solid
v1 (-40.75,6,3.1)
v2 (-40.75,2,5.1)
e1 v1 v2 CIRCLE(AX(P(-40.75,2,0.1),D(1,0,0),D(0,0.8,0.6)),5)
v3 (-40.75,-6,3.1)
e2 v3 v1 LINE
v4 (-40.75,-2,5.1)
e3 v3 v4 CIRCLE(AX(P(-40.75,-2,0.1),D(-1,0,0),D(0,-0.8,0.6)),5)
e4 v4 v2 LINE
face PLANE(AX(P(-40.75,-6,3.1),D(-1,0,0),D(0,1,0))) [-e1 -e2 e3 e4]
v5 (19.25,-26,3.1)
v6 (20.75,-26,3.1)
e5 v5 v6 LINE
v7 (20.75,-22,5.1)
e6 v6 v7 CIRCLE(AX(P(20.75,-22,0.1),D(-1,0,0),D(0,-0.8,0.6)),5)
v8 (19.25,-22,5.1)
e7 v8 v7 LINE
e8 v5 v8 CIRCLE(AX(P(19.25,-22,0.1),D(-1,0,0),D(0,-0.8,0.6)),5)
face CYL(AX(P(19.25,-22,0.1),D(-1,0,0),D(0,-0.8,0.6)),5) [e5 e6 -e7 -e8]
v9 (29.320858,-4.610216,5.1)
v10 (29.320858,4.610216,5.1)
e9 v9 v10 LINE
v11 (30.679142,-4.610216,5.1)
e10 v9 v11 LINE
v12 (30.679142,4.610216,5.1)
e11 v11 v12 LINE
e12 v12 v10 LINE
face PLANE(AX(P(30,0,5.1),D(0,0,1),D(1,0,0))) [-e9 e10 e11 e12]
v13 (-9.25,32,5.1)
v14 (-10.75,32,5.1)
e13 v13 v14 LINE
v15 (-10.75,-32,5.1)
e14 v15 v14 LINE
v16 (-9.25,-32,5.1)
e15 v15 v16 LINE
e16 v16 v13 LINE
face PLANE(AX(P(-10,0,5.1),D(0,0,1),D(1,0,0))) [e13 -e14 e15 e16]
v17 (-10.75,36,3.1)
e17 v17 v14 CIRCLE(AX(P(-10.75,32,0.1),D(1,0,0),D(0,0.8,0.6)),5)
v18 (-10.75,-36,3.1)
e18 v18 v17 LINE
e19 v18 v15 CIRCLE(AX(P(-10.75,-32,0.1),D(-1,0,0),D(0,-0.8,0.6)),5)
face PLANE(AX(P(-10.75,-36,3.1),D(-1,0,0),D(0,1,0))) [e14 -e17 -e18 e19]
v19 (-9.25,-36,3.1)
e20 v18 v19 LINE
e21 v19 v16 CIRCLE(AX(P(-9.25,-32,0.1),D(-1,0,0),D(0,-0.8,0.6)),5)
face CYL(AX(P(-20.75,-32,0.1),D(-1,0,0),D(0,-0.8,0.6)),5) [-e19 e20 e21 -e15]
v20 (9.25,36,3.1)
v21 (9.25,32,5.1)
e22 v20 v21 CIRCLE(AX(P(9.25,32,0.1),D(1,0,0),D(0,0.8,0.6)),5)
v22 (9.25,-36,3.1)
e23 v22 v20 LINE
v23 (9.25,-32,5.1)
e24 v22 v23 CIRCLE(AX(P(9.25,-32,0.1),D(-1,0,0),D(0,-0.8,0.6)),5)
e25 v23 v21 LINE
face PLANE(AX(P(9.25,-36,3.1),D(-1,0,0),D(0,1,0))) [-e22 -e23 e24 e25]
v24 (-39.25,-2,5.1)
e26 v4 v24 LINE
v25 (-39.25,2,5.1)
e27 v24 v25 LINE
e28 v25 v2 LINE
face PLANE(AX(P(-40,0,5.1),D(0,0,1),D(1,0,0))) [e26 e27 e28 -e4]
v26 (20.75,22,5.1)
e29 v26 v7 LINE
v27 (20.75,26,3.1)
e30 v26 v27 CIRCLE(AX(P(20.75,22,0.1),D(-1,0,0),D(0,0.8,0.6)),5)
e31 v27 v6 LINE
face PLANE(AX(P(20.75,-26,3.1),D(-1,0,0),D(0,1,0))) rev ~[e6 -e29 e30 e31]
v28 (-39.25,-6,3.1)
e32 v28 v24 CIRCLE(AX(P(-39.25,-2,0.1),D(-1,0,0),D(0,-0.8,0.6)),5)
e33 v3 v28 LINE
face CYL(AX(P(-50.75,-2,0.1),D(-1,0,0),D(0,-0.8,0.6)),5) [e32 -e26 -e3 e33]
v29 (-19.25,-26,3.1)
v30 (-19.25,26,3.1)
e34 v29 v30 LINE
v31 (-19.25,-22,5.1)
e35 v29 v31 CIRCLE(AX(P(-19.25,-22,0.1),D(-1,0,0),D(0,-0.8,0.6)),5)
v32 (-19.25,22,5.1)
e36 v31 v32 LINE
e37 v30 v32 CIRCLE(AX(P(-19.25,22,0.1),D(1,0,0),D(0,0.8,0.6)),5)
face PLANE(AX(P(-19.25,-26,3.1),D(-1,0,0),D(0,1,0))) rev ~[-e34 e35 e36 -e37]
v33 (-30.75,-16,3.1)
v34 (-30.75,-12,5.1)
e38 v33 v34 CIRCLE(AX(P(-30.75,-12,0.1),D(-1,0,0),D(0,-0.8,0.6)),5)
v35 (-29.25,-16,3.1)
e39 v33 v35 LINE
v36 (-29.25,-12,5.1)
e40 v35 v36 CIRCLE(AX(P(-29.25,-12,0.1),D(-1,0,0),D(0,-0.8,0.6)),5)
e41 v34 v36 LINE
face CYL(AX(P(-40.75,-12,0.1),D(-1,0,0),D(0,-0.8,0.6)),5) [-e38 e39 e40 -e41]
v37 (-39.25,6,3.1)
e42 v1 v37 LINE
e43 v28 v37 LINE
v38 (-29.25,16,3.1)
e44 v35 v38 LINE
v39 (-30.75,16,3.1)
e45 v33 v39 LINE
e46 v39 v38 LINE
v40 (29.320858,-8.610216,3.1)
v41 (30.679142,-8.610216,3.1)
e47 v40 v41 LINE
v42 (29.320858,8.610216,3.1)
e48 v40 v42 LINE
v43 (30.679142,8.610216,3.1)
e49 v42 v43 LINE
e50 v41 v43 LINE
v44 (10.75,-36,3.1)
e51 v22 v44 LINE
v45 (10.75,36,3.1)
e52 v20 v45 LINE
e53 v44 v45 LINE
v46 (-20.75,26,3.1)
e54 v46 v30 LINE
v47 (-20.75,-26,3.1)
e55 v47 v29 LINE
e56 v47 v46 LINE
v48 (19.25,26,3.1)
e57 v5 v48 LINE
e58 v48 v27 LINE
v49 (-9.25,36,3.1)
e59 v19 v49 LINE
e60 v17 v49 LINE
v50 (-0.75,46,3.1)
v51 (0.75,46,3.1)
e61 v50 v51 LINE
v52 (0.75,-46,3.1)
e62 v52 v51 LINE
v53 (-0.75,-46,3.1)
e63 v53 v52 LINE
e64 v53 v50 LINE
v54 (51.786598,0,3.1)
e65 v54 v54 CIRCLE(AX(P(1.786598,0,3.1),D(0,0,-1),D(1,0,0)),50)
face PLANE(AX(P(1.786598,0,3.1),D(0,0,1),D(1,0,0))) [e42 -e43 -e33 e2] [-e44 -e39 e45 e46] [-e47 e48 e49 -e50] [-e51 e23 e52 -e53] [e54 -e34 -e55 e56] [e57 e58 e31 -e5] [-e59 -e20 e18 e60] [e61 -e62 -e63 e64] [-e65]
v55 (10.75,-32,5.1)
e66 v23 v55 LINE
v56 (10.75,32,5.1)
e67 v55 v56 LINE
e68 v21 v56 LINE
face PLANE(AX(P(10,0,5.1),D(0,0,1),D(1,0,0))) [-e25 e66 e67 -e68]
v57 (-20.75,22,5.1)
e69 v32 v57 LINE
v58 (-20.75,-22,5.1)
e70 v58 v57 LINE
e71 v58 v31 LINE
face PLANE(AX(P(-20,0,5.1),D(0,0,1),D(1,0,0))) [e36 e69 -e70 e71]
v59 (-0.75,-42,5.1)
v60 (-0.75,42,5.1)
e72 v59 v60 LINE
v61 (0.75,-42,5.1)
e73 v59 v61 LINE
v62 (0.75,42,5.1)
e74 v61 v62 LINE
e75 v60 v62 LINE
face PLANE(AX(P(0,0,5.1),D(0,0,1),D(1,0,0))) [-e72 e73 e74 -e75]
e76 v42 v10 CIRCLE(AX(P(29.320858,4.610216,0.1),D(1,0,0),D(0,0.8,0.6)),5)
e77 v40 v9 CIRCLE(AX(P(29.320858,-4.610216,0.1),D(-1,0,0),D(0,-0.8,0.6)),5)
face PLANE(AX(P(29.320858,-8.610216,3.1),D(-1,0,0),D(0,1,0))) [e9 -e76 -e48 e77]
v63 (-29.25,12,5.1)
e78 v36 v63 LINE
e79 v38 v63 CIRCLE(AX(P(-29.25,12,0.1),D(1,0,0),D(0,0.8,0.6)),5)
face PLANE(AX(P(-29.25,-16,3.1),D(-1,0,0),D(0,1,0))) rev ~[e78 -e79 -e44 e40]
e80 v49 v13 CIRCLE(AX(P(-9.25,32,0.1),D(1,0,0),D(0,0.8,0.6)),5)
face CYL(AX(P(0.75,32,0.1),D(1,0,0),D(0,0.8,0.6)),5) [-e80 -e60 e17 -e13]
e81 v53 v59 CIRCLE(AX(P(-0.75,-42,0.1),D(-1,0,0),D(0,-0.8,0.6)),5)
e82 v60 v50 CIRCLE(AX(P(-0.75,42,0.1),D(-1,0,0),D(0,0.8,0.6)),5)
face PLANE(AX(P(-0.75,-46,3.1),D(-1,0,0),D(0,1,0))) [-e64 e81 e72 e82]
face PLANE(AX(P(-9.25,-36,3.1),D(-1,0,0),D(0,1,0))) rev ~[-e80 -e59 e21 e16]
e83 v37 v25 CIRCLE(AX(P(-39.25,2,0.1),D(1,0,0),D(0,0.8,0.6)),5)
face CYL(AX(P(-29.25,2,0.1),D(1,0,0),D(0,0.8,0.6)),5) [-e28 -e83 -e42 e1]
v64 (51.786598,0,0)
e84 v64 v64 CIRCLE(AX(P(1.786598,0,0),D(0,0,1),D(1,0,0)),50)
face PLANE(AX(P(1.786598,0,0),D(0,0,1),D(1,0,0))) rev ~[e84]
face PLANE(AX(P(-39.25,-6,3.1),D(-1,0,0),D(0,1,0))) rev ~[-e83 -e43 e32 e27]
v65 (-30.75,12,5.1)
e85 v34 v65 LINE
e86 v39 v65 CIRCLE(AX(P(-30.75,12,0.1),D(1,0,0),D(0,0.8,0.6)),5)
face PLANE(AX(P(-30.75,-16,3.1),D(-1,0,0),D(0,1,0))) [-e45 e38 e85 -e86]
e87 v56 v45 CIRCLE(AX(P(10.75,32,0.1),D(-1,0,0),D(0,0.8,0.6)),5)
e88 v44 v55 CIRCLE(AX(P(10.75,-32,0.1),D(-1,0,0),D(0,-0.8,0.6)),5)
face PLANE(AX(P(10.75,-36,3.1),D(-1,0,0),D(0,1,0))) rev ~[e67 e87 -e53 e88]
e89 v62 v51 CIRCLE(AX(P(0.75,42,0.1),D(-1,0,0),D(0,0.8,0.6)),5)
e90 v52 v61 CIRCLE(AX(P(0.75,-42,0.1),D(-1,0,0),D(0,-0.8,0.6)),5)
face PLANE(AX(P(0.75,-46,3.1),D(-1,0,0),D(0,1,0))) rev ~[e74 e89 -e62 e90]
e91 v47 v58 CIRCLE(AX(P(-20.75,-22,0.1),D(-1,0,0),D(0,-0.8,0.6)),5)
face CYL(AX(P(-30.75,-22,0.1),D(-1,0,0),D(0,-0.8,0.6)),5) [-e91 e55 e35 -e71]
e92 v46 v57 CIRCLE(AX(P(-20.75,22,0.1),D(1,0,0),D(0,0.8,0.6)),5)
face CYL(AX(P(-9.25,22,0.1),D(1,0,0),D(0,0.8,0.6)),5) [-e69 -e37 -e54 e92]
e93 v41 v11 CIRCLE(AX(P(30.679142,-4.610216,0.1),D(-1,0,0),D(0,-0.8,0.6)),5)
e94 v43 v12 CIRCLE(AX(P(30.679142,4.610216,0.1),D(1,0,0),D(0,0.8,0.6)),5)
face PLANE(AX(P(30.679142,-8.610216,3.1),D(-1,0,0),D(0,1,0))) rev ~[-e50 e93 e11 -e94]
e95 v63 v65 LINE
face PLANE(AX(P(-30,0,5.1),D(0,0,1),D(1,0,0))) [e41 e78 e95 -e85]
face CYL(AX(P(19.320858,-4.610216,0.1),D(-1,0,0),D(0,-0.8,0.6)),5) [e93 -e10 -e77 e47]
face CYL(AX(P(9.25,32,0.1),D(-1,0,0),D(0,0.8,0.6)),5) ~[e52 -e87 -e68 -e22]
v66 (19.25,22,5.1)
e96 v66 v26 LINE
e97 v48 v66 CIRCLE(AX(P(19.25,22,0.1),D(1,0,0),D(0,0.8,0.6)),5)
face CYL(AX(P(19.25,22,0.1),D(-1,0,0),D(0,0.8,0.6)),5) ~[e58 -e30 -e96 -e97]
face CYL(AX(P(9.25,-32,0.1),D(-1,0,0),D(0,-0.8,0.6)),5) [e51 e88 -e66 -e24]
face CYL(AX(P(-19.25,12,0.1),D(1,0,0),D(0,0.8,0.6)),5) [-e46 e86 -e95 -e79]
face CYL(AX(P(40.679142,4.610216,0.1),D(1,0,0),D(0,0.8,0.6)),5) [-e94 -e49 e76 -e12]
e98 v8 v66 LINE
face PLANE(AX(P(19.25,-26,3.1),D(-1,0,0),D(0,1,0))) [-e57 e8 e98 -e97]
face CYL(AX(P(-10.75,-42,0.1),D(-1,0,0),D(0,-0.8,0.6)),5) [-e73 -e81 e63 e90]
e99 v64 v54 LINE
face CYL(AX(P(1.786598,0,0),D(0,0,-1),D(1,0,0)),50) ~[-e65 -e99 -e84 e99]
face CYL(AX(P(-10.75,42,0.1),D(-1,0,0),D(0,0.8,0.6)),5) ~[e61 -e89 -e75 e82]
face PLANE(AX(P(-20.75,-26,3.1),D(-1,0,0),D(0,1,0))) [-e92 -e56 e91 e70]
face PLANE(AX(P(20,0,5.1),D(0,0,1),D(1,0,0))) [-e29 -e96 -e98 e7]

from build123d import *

# Parameters (mm, degrees)
F0_R         = 50
F1_DEPTH     = 3.1
F2_W         = 1.5
F2_H         = 92
F2_H_2       = 72
F2_H_3       = 52
F2_H_4       = 32
F2_H_5       = 12
F2_W_2       = 1.3582831621
F2_H_6       = 17.2204319388
F3_DEPTH     = 2
F4_T1_DEPTH  = 11.5
F4_T3_DEPTH  = 11.5
F4_T5_DEPTH  = 21.5
F4_T10_DEPTH = 21.5
F4_T15_DEPTH = 21.5
F4_T20_DEPTH = 21.5
F4_T25_DEPTH = 21.5
F4_T30_DEPTH = 21.5
F4_T35_DEPTH = 21.5
F4_T40_DEPTH = 21.5
F4_T45_DEPTH = 21.5
F4_T50_DEPTH = 21.3582831621
F4_T55_DEPTH = 21.3582831621


# Not quite as in the source:
# - a fillet or chamfer that OpenCascade refuses, or shapes differently, is made with other operations: its cross-section is extruded or revolved along the edge and cut away or added


with BuildPart() as f1:
    # F0 (on Top) → F1 (new body)
    with BuildSketch(Plane.XY):
        with Locations((1.7865982372, 0)):
            Circle(F0_R)
    extrude(amount=F1_DEPTH)

    # F2 (on face) → F3 (join)
    with BuildSketch(Plane.XY.offset(3.1)):
        Rectangle(F2_W, F2_H)
        with Locations((-10, 0)):
            Rectangle(F2_W, F2_H_2)
        with Locations((-20, 0)):
            Rectangle(F2_W, F2_H_3)
        with Locations((-30, 0)):
            Rectangle(F2_W, F2_H_4)
        with Locations((-40, 0)):
            Rectangle(F2_W, F2_H_5)
        with Locations((10, 0)):
            Rectangle(F2_W, F2_H_2)
        with Locations((20, 0)):
            Rectangle(F2_W, F2_H_3)
        with Locations((30, 0)):
            Rectangle(F2_W_2, F2_H_6)
    extrude(amount=F3_DEPTH)

    # F4: fillet of radius 5 on 16 edges, made by hand

    # F4_s2 → F4_t1 (cut)
    with BuildSketch(Plane.YZ.offset(9.25)):
        with BuildLine():
            ThreePointArc((-36, 3.1), (-34.2360679775, 4.572135955), (-32, 5.1))
            Line((-32, 5.1), (-36, 5.1))
            Line((-36, 5.1), (-36, 3.1))
        make_face()
        with BuildLine():
            ThreePointArc((36, 3.1), (34.2360679775, 4.572135955), (32, 5.1))
            Line((32, 5.1), (36, 5.1))
            Line((36, 5.1), (36, 3.1))
        make_face()
    extrude(amount=F4_T1_DEPTH, mode=Mode.SUBTRACT)

    # F4_s4 → F4_t3 (cut)
    with BuildSketch(Plane.YZ.offset(19.25)):
        with BuildLine():
            ThreePointArc((26, 3.1), (24.2360679775, 4.572135955), (22, 5.1))
            Line((22, 5.1), (26, 5.1))
            Line((26, 5.1), (26, 3.1))
        make_face()
        with BuildLine():
            ThreePointArc((-26, 3.1), (-24.2360679775, 4.572135955), (-22, 5.1))
            Line((-22, 5.1), (-26, 5.1))
            Line((-26, 5.1), (-26, 3.1))
        make_face()
    extrude(amount=F4_T3_DEPTH, mode=Mode.SUBTRACT)

    # F4_s6 → F4_t5 (cut)
    with BuildSketch(Plane.YZ.offset(-10.75)):
        with BuildLine():
            ThreePointArc((46, 3.1), (44.2360679775, 4.572135955), (42, 5.1))
            Line((42, 5.1), (46, 5.1))
            Line((46, 5.1), (46, 3.1))
        make_face()
        with BuildLine():
            ThreePointArc((-46, 3.1), (-44.2360679775, 4.572135955), (-42, 5.1))
            Line((-42, 5.1), (-46, 5.1))
            Line((-46, 5.1), (-46, 3.1))
        make_face()
    extrude(amount=F4_T5_DEPTH, mode=Mode.SUBTRACT)


with BuildPart() as f4_tool8:
    # F4_s9 → F4_t10 (new body)
    with BuildSketch(Plane.YZ.offset(0.75)):
        with BuildLine():
            ThreePointArc((36, 3.1), (34.2360679775, 4.572135955), (32, 5.1))
            Line((32, 5.1), (36, 5.1))
            Line((36, 5.1), (36, 3.1))
        make_face()
    extrude(amount=-F4_T10_DEPTH)

    split(bisect_by=Plane.YZ.offset(-0.75), keep=Keep.BOTTOM)


with BuildPart() as f1_1:
    add(f1.part)

    # F4_t7: cut F4_tool8
    add(f4_tool8.part, mode=Mode.SUBTRACT)


with BuildPart() as f4_tool13:
    # F4_s14 → F4_t15 (new body)
    with BuildSketch(Plane.YZ.offset(-9.25)):
        with BuildLine():
            ThreePointArc((26, 3.1), (24.2360679775, 4.572135955), (22, 5.1))
            Line((22, 5.1), (26, 5.1))
            Line((26, 5.1), (26, 3.1))
        make_face()
    extrude(amount=-F4_T15_DEPTH)

    split(bisect_by=Plane.YZ.offset(-10.75), keep=Keep.BOTTOM)


with BuildPart() as f1_2:
    add(f1_1.part)

    # F4_t12: cut F4_tool13
    add(f4_tool13.part, mode=Mode.SUBTRACT)


with BuildPart() as f4_tool18:
    # F4_s19 → F4_t20 (new body)
    with BuildSketch(Plane.YZ.offset(-19.25)):
        with BuildLine():
            ThreePointArc((16, 3.1), (14.2360679775, 4.572135955), (12, 5.1))
            Line((12, 5.1), (16, 5.1))
            Line((16, 5.1), (16, 3.1))
        make_face()
    extrude(amount=-F4_T20_DEPTH)

    split(bisect_by=Plane.YZ.offset(-20.75), keep=Keep.BOTTOM)


with BuildPart() as f1_3:
    add(f1_2.part)

    # F4_t17: cut F4_tool18
    add(f4_tool18.part, mode=Mode.SUBTRACT)


with BuildPart() as f4_tool23:
    # F4_s24 → F4_t25 (new body)
    with BuildSketch(Plane.YZ.offset(-29.25)):
        with BuildLine():
            ThreePointArc((6, 3.1), (4.2360679775, 4.572135955), (2, 5.1))
            Line((2, 5.1), (6, 5.1))
            Line((6, 5.1), (6, 3.1))
        make_face()
    extrude(amount=-F4_T25_DEPTH)

    split(bisect_by=Plane.YZ.offset(-30.75), keep=Keep.BOTTOM)


with BuildPart() as f1_4:
    add(f1_3.part)

    # F4_t22: cut F4_tool23
    add(f4_tool23.part, mode=Mode.SUBTRACT)


with BuildPart() as f4_tool28:
    # F4_s29 → F4_t30 (new body)
    with BuildSketch(Plane.YZ.offset(-50.75)):
        with BuildLine():
            ThreePointArc((-6, 3.1), (-4.2360679775, 4.572135955), (-2, 5.1))
            Line((-2, 5.1), (-6, 5.1))
            Line((-6, 5.1), (-6, 3.1))
        make_face()
    extrude(amount=F4_T30_DEPTH)

    split(bisect_by=Plane.YZ.offset(-30.75), keep=Keep.BOTTOM)


with BuildPart() as f1_5:
    add(f1_4.part)

    # F4_t27: cut F4_tool28
    add(f4_tool28.part, mode=Mode.SUBTRACT)


with BuildPart() as f4_tool33:
    # F4_s34 → F4_t35 (new body)
    with BuildSketch(Plane.YZ.offset(-40.75)):
        with BuildLine():
            ThreePointArc((-16, 3.1), (-14.2360679775, 4.572135955), (-12, 5.1))
            Line((-12, 5.1), (-16, 5.1))
            Line((-16, 5.1), (-16, 3.1))
        make_face()
    extrude(amount=F4_T35_DEPTH)

    split(bisect_by=Plane.YZ.offset(-20.75), keep=Keep.BOTTOM)


with BuildPart() as f1_6:
    add(f1_5.part)

    # F4_t32: cut F4_tool33
    add(f4_tool33.part, mode=Mode.SUBTRACT)


with BuildPart() as f4_tool38:
    # F4_s39 → F4_t40 (new body)
    with BuildSketch(Plane.YZ.offset(-30.75)):
        with BuildLine():
            ThreePointArc((-26, 3.1), (-24.2360679775, 4.572135955), (-22, 5.1))
            Line((-22, 5.1), (-26, 5.1))
            Line((-26, 5.1), (-26, 3.1))
        make_face()
    extrude(amount=F4_T40_DEPTH)

    split(bisect_by=Plane.YZ.offset(-10.75), keep=Keep.BOTTOM)


with BuildPart() as f1_7:
    add(f1_6.part)

    # F4_t37: cut F4_tool38
    add(f4_tool38.part, mode=Mode.SUBTRACT)


with BuildPart() as f4_tool43:
    # F4_s44 → F4_t45 (new body)
    with BuildSketch(Plane.YZ.offset(-20.75)):
        with BuildLine():
            ThreePointArc((-36, 3.1), (-34.2360679775, 4.572135955), (-32, 5.1))
            Line((-32, 5.1), (-36, 5.1))
            Line((-36, 5.1), (-36, 3.1))
        make_face()
    extrude(amount=F4_T45_DEPTH)

    split(bisect_by=Plane.YZ.offset(-0.75), keep=Keep.BOTTOM)


with BuildPart() as f1_8:
    add(f1_7.part)

    # F4_t42: cut F4_tool43
    add(f4_tool43.part, mode=Mode.SUBTRACT)


with BuildPart() as f4_tool48:
    # F4_s49 → F4_t50 (new body)
    with BuildSketch(Plane.YZ.offset(19.3208584189)):
        with BuildLine():
            ThreePointArc((-8.6102159694, 3.1), (-6.8462839469, 4.572135955), (-4.6102159694, 5.1))
            Line((-4.6102159694, 5.1), (-8.6102159694, 5.1))
            Line((-8.6102159694, 5.1), (-8.6102159694, 3.1))
        make_face()
    extrude(amount=F4_T50_DEPTH)

    split(bisect_by=Plane.YZ.offset(20.75), keep=Keep.TOP)


with BuildPart() as f1_9:
    add(f1_8.part)

    # F4_t47: cut F4_tool48
    add(f4_tool48.part, mode=Mode.SUBTRACT)


with BuildPart() as f4_tool53:
    # F4_s54 → F4_t55 (new body)
    with BuildSketch(Plane.YZ.offset(40.6791415811)):
        with BuildLine():
            ThreePointArc((8.6102159694, 3.1), (6.8462839469, 4.572135955), (4.6102159694, 5.1))
            Line((4.6102159694, 5.1), (8.6102159694, 5.1))
            Line((8.6102159694, 5.1), (8.6102159694, 3.1))
        make_face()
    extrude(amount=-F4_T55_DEPTH)

    split(bisect_by=Plane.YZ.offset(20.75), keep=Keep.TOP)


with BuildPart() as f1_10:
    add(f1_9.part)

    # F4_t52: cut F4_tool53
    add(f4_tool53.part, mode=Mode.SUBTRACT)


solid = f1_10.part
